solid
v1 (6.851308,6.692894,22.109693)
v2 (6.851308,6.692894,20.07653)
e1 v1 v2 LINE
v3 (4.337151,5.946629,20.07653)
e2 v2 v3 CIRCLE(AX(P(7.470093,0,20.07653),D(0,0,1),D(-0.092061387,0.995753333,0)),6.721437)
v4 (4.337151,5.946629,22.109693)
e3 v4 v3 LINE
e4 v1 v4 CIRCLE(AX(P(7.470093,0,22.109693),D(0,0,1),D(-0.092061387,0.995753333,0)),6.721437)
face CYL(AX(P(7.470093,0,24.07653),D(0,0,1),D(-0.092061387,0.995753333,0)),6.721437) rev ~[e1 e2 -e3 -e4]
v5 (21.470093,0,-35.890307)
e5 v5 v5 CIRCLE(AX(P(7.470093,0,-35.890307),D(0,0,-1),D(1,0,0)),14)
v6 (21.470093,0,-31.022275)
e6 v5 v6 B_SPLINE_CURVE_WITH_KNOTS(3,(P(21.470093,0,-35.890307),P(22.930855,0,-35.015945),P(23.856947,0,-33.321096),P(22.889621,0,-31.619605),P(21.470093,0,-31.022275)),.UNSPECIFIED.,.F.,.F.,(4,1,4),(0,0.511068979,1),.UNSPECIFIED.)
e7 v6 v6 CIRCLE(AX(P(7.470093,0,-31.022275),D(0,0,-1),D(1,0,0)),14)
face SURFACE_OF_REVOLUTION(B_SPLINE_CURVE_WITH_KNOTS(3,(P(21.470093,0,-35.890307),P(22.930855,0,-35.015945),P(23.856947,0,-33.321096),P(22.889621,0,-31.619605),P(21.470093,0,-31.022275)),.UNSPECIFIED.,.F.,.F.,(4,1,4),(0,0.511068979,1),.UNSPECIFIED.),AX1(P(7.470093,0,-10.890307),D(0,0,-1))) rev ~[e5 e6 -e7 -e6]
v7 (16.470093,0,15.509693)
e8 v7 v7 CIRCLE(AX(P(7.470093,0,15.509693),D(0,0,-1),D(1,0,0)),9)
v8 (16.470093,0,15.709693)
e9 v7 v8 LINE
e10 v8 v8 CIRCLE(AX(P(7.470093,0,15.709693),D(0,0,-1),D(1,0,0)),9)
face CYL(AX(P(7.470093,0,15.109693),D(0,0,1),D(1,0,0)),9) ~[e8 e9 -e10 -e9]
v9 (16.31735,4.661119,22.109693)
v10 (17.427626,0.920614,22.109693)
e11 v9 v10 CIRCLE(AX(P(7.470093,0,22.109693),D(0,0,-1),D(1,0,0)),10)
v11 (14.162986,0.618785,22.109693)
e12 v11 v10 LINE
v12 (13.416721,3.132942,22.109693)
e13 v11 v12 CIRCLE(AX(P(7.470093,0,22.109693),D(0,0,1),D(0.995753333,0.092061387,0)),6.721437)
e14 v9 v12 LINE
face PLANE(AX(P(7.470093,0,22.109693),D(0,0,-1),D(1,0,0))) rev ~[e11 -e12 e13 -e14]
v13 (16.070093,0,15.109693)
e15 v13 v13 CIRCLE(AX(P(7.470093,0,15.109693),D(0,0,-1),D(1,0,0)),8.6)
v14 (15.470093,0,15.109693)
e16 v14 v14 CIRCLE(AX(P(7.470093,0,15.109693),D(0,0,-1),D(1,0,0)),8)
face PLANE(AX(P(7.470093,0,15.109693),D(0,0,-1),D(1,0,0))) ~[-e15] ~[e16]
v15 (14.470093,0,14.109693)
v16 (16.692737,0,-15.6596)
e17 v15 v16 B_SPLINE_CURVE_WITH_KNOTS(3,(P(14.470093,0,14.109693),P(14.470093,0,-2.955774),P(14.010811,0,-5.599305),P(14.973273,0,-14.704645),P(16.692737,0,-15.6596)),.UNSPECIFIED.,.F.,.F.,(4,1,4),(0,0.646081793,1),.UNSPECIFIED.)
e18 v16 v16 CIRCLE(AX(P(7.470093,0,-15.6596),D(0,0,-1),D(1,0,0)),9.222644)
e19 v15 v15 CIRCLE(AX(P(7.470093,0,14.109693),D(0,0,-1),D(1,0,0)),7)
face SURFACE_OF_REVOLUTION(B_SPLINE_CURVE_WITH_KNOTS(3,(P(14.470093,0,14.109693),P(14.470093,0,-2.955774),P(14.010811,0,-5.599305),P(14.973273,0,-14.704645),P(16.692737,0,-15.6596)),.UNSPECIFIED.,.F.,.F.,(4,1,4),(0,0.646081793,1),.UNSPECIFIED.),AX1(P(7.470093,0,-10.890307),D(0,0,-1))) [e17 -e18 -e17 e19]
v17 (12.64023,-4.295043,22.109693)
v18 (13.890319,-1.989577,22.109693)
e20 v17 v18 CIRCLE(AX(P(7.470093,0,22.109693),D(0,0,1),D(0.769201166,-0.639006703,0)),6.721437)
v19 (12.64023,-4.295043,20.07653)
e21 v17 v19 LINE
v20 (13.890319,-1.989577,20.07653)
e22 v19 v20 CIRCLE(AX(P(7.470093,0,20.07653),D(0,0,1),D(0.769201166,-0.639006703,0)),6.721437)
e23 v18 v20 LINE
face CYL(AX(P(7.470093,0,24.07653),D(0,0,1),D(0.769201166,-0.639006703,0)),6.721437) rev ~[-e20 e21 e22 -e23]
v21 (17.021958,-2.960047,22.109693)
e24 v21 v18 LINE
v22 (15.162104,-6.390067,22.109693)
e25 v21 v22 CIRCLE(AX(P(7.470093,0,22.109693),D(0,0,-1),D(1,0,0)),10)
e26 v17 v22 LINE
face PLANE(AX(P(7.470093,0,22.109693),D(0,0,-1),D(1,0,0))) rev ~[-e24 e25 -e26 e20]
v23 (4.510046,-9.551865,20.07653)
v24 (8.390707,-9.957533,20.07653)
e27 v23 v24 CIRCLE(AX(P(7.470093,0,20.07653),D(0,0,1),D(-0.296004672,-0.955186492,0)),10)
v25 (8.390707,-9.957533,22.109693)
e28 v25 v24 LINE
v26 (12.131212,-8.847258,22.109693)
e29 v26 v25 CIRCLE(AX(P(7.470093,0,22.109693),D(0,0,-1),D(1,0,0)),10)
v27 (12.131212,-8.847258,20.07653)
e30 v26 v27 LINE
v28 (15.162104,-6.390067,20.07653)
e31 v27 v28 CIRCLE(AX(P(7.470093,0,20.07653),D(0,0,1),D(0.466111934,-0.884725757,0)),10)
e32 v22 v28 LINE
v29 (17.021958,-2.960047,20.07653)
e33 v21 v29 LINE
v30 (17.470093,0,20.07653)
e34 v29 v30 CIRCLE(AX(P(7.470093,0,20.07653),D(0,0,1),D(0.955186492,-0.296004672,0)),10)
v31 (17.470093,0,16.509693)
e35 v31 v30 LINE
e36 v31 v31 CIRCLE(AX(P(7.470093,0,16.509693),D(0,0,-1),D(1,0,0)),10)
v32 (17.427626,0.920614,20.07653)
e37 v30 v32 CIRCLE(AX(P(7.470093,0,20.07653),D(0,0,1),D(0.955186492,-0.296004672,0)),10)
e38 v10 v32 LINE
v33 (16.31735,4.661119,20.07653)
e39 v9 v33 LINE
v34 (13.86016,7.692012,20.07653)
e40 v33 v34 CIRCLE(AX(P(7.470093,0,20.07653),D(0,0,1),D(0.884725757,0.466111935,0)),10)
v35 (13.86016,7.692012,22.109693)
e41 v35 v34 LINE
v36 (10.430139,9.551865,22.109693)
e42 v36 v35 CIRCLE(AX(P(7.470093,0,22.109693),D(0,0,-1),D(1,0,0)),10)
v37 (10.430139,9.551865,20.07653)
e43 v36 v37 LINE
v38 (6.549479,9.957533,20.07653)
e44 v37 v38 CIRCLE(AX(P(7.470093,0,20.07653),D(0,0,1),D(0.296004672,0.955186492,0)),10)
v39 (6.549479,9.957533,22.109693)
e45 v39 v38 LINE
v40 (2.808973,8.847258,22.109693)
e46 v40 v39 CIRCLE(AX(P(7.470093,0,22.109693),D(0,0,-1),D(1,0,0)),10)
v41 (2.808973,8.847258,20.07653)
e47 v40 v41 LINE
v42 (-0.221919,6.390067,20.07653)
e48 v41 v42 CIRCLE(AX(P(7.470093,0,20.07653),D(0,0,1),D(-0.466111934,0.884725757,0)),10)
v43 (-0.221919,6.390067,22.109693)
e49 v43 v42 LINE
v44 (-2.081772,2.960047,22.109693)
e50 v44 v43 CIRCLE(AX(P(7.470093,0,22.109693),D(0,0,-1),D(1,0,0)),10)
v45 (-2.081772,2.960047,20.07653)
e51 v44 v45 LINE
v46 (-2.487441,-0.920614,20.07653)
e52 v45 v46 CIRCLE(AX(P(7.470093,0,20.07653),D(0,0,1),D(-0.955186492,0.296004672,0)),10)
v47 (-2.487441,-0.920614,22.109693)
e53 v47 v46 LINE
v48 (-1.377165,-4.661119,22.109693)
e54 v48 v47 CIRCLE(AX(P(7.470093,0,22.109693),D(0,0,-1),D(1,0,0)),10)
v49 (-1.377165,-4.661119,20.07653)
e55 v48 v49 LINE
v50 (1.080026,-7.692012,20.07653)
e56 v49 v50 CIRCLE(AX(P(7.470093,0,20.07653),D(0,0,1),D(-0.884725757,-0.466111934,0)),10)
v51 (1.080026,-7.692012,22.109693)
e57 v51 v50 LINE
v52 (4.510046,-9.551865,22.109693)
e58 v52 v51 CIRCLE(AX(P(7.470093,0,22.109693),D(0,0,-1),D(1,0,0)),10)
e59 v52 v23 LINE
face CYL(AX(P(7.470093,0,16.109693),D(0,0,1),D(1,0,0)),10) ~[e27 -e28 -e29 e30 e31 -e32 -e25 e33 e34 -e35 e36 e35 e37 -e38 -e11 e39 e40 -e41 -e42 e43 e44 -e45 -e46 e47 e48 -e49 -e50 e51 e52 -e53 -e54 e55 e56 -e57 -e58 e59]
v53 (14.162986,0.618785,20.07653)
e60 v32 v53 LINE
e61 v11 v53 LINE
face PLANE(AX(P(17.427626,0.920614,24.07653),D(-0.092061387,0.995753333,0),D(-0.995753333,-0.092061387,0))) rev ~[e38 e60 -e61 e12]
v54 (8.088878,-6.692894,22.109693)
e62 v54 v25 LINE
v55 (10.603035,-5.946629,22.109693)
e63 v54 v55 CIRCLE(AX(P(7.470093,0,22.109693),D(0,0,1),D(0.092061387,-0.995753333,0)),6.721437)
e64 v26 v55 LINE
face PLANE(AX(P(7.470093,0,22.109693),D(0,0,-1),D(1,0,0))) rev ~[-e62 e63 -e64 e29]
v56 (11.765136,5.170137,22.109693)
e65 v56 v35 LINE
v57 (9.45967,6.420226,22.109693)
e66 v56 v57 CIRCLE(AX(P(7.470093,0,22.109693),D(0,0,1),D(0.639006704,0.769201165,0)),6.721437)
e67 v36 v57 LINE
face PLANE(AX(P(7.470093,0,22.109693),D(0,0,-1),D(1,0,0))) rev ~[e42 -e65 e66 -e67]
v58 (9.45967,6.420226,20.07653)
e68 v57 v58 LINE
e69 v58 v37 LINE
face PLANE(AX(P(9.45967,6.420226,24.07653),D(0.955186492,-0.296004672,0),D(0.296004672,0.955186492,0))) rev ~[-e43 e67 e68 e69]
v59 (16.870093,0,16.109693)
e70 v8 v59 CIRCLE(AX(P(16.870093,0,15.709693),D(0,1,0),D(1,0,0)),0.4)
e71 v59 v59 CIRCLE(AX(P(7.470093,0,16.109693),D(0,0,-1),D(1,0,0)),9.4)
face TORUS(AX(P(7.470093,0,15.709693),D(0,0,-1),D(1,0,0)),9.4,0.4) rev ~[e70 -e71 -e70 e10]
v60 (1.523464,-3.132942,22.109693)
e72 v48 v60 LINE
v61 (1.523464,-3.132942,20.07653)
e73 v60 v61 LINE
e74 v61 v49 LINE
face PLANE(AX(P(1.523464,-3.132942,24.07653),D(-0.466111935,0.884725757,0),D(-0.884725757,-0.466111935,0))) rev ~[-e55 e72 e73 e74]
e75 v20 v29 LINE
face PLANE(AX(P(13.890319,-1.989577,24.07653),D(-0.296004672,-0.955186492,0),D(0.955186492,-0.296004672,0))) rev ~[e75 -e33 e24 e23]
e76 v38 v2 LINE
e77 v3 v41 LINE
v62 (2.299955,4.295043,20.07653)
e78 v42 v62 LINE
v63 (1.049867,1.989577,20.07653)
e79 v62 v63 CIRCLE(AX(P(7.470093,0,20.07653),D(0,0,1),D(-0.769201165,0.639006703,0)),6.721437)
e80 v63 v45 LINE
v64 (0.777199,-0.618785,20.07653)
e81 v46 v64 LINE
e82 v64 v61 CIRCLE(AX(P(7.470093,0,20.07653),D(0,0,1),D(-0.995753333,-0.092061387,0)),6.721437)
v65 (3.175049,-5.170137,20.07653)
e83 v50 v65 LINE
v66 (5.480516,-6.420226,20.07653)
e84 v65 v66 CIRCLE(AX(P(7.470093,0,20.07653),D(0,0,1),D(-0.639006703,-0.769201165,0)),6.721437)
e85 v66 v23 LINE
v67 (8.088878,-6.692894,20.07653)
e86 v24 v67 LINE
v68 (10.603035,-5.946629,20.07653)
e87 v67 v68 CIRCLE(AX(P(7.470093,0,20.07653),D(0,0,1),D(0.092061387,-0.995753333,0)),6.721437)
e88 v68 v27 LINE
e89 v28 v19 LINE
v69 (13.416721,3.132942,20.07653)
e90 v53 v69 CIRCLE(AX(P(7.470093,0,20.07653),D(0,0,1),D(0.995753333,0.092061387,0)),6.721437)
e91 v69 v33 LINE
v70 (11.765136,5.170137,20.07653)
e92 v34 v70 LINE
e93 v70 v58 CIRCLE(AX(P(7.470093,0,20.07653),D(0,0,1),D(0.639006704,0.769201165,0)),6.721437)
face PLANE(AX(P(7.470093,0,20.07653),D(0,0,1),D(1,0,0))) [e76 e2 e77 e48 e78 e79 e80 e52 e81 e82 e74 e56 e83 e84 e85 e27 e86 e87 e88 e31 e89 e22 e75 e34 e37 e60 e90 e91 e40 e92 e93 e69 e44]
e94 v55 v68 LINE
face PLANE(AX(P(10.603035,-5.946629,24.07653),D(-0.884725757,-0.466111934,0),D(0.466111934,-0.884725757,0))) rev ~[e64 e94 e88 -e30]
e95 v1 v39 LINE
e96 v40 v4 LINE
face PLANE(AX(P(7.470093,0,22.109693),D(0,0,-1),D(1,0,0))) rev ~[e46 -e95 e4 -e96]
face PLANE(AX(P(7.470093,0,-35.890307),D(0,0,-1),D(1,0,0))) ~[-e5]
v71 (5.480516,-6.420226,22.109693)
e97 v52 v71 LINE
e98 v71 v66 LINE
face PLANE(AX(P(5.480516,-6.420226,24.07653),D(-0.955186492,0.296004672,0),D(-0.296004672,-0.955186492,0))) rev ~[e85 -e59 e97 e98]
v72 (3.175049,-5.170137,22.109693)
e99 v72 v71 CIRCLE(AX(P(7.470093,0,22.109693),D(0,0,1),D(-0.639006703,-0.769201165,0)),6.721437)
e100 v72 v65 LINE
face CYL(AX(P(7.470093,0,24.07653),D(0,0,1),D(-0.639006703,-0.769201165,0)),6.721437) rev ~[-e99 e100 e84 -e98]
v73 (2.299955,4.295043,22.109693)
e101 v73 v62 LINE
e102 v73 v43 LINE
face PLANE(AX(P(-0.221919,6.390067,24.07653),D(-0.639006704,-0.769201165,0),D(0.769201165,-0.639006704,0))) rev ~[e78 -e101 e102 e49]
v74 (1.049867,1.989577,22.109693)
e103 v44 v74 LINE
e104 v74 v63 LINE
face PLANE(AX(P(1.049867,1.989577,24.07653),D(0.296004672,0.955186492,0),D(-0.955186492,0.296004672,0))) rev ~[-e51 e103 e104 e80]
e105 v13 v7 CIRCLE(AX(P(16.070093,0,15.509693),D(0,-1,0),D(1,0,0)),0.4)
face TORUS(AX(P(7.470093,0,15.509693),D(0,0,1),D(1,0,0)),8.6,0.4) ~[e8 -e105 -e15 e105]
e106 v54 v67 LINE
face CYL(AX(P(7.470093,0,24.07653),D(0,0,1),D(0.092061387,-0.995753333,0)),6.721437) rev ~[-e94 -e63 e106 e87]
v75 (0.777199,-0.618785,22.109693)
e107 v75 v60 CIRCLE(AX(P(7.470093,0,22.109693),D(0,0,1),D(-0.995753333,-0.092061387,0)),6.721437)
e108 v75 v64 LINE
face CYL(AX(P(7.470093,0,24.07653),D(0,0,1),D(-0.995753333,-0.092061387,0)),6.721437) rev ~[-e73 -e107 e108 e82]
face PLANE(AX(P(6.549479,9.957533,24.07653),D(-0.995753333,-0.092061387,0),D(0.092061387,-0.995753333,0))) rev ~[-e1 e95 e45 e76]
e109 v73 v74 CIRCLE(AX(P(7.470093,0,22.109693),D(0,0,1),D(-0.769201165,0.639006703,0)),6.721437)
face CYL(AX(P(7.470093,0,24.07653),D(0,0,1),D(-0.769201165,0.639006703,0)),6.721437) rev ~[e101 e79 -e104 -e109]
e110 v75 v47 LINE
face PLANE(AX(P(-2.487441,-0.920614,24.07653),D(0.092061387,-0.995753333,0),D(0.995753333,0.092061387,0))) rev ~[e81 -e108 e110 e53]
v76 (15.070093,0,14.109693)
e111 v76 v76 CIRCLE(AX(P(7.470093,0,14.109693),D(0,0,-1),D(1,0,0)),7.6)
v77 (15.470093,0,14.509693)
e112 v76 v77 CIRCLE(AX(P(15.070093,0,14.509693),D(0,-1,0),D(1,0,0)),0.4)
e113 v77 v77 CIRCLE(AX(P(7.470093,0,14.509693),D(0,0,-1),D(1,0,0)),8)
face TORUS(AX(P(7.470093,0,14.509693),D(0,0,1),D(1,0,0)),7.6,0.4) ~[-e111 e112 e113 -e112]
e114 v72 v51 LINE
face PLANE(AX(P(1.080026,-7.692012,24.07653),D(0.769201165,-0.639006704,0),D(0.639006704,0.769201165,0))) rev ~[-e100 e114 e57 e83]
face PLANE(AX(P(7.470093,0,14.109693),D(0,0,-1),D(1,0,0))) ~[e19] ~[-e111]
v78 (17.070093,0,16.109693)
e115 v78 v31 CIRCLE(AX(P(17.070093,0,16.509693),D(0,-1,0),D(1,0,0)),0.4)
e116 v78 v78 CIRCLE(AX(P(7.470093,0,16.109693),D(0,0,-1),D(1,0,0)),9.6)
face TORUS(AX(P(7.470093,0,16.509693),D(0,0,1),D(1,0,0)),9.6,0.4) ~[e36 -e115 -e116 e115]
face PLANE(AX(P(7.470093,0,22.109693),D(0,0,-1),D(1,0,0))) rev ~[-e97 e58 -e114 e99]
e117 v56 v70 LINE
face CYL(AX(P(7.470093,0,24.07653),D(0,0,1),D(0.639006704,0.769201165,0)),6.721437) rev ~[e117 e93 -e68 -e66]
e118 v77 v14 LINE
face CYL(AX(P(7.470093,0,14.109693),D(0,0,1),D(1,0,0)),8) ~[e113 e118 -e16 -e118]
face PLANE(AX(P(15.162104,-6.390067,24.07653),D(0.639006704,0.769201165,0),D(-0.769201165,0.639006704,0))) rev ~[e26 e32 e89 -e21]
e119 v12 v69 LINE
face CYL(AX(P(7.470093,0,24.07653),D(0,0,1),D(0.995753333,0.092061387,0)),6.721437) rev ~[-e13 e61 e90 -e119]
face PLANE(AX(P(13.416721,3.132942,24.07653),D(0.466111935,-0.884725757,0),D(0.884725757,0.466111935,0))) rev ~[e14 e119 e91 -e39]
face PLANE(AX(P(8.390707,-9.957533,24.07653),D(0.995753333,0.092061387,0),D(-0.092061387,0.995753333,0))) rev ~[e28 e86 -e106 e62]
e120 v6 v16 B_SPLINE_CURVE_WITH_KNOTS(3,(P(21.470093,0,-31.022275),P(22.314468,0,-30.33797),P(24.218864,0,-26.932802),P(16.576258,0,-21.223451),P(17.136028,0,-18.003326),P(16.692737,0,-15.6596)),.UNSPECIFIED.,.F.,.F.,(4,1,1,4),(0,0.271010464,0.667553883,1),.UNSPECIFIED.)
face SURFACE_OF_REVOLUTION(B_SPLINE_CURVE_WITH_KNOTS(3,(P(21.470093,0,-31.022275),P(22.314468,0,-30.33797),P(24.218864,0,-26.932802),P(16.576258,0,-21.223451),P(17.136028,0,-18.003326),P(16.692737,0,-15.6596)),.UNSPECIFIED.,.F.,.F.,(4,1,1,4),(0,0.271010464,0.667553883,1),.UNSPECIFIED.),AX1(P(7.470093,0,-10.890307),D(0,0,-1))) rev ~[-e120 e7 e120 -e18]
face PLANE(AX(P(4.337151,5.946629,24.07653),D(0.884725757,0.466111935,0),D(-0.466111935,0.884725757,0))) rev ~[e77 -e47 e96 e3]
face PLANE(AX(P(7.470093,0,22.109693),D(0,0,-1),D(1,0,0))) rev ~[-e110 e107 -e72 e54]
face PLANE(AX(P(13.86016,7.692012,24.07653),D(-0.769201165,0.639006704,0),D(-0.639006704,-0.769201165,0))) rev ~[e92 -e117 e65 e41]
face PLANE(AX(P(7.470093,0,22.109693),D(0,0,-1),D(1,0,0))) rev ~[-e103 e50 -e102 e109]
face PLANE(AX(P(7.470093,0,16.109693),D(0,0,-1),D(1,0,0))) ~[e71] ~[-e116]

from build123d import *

# Parameters (mm, degrees)
F4_DEPTH = 4
F5_R     = 0.4


with BuildPart() as f1:
    # F0 (on Front) → F1 (revolve)
    with BuildSketch(Plane.XZ):
        with BuildLine():
            Line((7.4700926862, 14.109692609), (7.4700926862, -35.890307391))
            Line((7.4700926862, -35.890307391), (21.4700926862, -35.890307391))
            add(Edge.make_bspline(
                [(21.4700926862, -35.890307391), (22.9308548616, -35.015944948), (23.8569471054, -33.3210956528), (22.8896205888, -31.6196046119), (21.4700926862, -31.0222748667)],
                knots=[0, 0, 0, 0, 0.5110689786, 1, 1, 1, 1], degree=3))
            add(Edge.make_bspline(
                [(21.4700926862, -31.0222748667), (22.3144681852, -30.3379701873), (24.2188639082, -26.9328023049), (16.5762578768, -21.2234513875), (17.1360278665, -18.0033264541), (16.6927366865, -15.6595999994)],
                knots=[0, 0, 0, 0, 0.271010464, 0.6675538828, 1, 1, 1, 1], degree=3))
            add(Edge.make_bspline(
                [(14.4700926862, 14.109692609), (14.4700926862, -2.9557740159), (14.0108114789, -5.5993047887), (14.9732734996, -14.7046454667), (16.6927366865, -15.6595999994)],
                knots=[0, 0, 0, 0, 0.6460817935, 1, 1, 1, 1], degree=3))
            Line((14.4700926862, 14.109692609), (15.4700926862, 14.109692609))
            Line((15.4700926862, 14.109692609), (15.4700926862, 15.109692609))
            Line((15.4700926862, 15.109692609), (16.4700926862, 15.109692609))
            Line((16.4700926862, 15.109692609), (16.4700926862, 16.109692609))
            Line((16.4700926862, 16.109692609), (17.4700926862, 16.109692609))
            Line((17.4700926862, 16.109692609), (17.4700926862, 22.109692609))
            Line((17.4700926862, 22.109692609), (7.4700926862, 22.109692609))
            Line((7.4700926862, 22.109692609), (7.4700926862, 14.109692609))
        make_face()
    revolve(axis=Axis((7.4700926862, 0, -10.890307391), (0, 0, -1)))

    # F3 (on offset) → F4 (cut)
    with BuildSketch(Plane.XY.offset(24.07653)):
        with BuildLine():
            Line((-0.2219189679, 6.3900670351), (2.2999553212, 4.2950434592))
            ThreePointArc((2.2999553212, 4.2950434592), (1.5613766494, 3.20387164), (1.0498666213, 1.9895768305))
            Line((1.0498666213, 1.9895768305), (-2.0817722309, 2.9600467235))
            ThreePointArc((-2.0817722309, 2.9600467235), (-2.4757122934, 1.0396938532), (-2.4874406482, -0.9206138689))
            Line((-2.4874406482, -0.9206138689), (0.7771991403, -0.618784835))
            ThreePointArc((0.7771991403, -0.618784835), (1.0265201458, -1.912613815), (1.5234640304, -3.1329421187))
            Line((1.5234640304, -3.1329421187), (-1.3771648805, -4.6611193451))
            ThreePointArc((-1.3771648805, -4.6611193451), (-0.2978280332, -6.2975715715), (1.0800256511, -7.6920116541))
            Line((1.0800256511, -7.6920116541), (3.175049227, -5.170137365))
            ThreePointArc((3.175049227, -5.170137365), (4.2662210462, -5.9087160368), (5.4805158557, -6.4202260649))
            Line((5.4805158557, -6.4202260649), (4.5100459627, -9.5518649171))
            ThreePointArc((4.5100459627, -9.5518649171), (6.430398833, -9.9458049796), (8.390706555, -9.9575333343))
            Line((8.390706555, -9.9575333343), (8.0888775212, -6.6928935459))
            ThreePointArc((8.0888775212, -6.6928935459), (9.3827065012, -6.4435725404), (10.6030348049, -5.9466286558))
            Line((10.6030348049, -5.9466286558), (12.1312120312, -8.8472575667))
            ThreePointArc((12.1312120312, -8.8472575667), (13.7676642577, -7.7679207194), (15.1621043403, -6.3900670351))
            Line((15.1621043403, -6.3900670351), (12.6402300512, -4.2950434592))
            ThreePointArc((12.6402300512, -4.2950434592), (13.3788087229, -3.20387164), (13.8903187511, -1.9895768305))
            Line((13.8903187511, -1.9895768305), (17.0219576033, -2.9600467235))
            ThreePointArc((17.0219576033, -2.9600467235), (17.4158976658, -1.0396938532), (17.4276260205, 0.9206138689))
            Line((17.4276260205, 0.9206138689), (14.1629862321, 0.618784835))
            ThreePointArc((14.1629862321, 0.618784835), (13.9136652266, 1.912613815), (13.416721342, 3.1329421187))
            Line((13.416721342, 3.1329421187), (16.3173502529, 4.6611193451))
            ThreePointArc((16.3173502529, 4.6611193451), (15.2380134055, 6.2975715715), (13.8601597213, 7.6920116541))
            Line((13.8601597213, 7.6920116541), (11.7651361453, 5.170137365))
            ThreePointArc((11.7651361453, 5.170137365), (10.6739643262, 5.9087160368), (9.4596695167, 6.4202260649))
            Line((9.4596695167, 6.4202260649), (10.4301394097, 9.5518649171))
            ThreePointArc((10.4301394097, 9.5518649171), (8.5097865394, 9.9458049796), (6.5494788173, 9.9575333343))
            Line((6.5494788173, 9.9575333343), (6.8513078512, 6.6928935459))
            ThreePointArc((6.8513078512, 6.6928935459), (5.5574788712, 6.4435725404), (4.3371505675, 5.9466286558))
            Line((4.3371505675, 5.9466286558), (2.8089733411, 8.8472575667))
            ThreePointArc((2.8089733411, 8.8472575667), (1.1725211147, 7.7679207194), (-0.2219189679, 6.3900670351))
        make_face()
    extrude(amount=-F4_DEPTH, mode=Mode.SUBTRACT)

    # F5
    f5_edges = [f1.edges().sort_by_distance(p)[0] for p in [
        (-1.529907, 0, 15.109693),
        (-0.529907, 0, 14.109693),
        (-1.529907, 0, 16.109693),
        (-2.529907, 0, 16.109693),
    ]]
    fillet(f5_edges, radius=F5_R)


solid = f1.part
